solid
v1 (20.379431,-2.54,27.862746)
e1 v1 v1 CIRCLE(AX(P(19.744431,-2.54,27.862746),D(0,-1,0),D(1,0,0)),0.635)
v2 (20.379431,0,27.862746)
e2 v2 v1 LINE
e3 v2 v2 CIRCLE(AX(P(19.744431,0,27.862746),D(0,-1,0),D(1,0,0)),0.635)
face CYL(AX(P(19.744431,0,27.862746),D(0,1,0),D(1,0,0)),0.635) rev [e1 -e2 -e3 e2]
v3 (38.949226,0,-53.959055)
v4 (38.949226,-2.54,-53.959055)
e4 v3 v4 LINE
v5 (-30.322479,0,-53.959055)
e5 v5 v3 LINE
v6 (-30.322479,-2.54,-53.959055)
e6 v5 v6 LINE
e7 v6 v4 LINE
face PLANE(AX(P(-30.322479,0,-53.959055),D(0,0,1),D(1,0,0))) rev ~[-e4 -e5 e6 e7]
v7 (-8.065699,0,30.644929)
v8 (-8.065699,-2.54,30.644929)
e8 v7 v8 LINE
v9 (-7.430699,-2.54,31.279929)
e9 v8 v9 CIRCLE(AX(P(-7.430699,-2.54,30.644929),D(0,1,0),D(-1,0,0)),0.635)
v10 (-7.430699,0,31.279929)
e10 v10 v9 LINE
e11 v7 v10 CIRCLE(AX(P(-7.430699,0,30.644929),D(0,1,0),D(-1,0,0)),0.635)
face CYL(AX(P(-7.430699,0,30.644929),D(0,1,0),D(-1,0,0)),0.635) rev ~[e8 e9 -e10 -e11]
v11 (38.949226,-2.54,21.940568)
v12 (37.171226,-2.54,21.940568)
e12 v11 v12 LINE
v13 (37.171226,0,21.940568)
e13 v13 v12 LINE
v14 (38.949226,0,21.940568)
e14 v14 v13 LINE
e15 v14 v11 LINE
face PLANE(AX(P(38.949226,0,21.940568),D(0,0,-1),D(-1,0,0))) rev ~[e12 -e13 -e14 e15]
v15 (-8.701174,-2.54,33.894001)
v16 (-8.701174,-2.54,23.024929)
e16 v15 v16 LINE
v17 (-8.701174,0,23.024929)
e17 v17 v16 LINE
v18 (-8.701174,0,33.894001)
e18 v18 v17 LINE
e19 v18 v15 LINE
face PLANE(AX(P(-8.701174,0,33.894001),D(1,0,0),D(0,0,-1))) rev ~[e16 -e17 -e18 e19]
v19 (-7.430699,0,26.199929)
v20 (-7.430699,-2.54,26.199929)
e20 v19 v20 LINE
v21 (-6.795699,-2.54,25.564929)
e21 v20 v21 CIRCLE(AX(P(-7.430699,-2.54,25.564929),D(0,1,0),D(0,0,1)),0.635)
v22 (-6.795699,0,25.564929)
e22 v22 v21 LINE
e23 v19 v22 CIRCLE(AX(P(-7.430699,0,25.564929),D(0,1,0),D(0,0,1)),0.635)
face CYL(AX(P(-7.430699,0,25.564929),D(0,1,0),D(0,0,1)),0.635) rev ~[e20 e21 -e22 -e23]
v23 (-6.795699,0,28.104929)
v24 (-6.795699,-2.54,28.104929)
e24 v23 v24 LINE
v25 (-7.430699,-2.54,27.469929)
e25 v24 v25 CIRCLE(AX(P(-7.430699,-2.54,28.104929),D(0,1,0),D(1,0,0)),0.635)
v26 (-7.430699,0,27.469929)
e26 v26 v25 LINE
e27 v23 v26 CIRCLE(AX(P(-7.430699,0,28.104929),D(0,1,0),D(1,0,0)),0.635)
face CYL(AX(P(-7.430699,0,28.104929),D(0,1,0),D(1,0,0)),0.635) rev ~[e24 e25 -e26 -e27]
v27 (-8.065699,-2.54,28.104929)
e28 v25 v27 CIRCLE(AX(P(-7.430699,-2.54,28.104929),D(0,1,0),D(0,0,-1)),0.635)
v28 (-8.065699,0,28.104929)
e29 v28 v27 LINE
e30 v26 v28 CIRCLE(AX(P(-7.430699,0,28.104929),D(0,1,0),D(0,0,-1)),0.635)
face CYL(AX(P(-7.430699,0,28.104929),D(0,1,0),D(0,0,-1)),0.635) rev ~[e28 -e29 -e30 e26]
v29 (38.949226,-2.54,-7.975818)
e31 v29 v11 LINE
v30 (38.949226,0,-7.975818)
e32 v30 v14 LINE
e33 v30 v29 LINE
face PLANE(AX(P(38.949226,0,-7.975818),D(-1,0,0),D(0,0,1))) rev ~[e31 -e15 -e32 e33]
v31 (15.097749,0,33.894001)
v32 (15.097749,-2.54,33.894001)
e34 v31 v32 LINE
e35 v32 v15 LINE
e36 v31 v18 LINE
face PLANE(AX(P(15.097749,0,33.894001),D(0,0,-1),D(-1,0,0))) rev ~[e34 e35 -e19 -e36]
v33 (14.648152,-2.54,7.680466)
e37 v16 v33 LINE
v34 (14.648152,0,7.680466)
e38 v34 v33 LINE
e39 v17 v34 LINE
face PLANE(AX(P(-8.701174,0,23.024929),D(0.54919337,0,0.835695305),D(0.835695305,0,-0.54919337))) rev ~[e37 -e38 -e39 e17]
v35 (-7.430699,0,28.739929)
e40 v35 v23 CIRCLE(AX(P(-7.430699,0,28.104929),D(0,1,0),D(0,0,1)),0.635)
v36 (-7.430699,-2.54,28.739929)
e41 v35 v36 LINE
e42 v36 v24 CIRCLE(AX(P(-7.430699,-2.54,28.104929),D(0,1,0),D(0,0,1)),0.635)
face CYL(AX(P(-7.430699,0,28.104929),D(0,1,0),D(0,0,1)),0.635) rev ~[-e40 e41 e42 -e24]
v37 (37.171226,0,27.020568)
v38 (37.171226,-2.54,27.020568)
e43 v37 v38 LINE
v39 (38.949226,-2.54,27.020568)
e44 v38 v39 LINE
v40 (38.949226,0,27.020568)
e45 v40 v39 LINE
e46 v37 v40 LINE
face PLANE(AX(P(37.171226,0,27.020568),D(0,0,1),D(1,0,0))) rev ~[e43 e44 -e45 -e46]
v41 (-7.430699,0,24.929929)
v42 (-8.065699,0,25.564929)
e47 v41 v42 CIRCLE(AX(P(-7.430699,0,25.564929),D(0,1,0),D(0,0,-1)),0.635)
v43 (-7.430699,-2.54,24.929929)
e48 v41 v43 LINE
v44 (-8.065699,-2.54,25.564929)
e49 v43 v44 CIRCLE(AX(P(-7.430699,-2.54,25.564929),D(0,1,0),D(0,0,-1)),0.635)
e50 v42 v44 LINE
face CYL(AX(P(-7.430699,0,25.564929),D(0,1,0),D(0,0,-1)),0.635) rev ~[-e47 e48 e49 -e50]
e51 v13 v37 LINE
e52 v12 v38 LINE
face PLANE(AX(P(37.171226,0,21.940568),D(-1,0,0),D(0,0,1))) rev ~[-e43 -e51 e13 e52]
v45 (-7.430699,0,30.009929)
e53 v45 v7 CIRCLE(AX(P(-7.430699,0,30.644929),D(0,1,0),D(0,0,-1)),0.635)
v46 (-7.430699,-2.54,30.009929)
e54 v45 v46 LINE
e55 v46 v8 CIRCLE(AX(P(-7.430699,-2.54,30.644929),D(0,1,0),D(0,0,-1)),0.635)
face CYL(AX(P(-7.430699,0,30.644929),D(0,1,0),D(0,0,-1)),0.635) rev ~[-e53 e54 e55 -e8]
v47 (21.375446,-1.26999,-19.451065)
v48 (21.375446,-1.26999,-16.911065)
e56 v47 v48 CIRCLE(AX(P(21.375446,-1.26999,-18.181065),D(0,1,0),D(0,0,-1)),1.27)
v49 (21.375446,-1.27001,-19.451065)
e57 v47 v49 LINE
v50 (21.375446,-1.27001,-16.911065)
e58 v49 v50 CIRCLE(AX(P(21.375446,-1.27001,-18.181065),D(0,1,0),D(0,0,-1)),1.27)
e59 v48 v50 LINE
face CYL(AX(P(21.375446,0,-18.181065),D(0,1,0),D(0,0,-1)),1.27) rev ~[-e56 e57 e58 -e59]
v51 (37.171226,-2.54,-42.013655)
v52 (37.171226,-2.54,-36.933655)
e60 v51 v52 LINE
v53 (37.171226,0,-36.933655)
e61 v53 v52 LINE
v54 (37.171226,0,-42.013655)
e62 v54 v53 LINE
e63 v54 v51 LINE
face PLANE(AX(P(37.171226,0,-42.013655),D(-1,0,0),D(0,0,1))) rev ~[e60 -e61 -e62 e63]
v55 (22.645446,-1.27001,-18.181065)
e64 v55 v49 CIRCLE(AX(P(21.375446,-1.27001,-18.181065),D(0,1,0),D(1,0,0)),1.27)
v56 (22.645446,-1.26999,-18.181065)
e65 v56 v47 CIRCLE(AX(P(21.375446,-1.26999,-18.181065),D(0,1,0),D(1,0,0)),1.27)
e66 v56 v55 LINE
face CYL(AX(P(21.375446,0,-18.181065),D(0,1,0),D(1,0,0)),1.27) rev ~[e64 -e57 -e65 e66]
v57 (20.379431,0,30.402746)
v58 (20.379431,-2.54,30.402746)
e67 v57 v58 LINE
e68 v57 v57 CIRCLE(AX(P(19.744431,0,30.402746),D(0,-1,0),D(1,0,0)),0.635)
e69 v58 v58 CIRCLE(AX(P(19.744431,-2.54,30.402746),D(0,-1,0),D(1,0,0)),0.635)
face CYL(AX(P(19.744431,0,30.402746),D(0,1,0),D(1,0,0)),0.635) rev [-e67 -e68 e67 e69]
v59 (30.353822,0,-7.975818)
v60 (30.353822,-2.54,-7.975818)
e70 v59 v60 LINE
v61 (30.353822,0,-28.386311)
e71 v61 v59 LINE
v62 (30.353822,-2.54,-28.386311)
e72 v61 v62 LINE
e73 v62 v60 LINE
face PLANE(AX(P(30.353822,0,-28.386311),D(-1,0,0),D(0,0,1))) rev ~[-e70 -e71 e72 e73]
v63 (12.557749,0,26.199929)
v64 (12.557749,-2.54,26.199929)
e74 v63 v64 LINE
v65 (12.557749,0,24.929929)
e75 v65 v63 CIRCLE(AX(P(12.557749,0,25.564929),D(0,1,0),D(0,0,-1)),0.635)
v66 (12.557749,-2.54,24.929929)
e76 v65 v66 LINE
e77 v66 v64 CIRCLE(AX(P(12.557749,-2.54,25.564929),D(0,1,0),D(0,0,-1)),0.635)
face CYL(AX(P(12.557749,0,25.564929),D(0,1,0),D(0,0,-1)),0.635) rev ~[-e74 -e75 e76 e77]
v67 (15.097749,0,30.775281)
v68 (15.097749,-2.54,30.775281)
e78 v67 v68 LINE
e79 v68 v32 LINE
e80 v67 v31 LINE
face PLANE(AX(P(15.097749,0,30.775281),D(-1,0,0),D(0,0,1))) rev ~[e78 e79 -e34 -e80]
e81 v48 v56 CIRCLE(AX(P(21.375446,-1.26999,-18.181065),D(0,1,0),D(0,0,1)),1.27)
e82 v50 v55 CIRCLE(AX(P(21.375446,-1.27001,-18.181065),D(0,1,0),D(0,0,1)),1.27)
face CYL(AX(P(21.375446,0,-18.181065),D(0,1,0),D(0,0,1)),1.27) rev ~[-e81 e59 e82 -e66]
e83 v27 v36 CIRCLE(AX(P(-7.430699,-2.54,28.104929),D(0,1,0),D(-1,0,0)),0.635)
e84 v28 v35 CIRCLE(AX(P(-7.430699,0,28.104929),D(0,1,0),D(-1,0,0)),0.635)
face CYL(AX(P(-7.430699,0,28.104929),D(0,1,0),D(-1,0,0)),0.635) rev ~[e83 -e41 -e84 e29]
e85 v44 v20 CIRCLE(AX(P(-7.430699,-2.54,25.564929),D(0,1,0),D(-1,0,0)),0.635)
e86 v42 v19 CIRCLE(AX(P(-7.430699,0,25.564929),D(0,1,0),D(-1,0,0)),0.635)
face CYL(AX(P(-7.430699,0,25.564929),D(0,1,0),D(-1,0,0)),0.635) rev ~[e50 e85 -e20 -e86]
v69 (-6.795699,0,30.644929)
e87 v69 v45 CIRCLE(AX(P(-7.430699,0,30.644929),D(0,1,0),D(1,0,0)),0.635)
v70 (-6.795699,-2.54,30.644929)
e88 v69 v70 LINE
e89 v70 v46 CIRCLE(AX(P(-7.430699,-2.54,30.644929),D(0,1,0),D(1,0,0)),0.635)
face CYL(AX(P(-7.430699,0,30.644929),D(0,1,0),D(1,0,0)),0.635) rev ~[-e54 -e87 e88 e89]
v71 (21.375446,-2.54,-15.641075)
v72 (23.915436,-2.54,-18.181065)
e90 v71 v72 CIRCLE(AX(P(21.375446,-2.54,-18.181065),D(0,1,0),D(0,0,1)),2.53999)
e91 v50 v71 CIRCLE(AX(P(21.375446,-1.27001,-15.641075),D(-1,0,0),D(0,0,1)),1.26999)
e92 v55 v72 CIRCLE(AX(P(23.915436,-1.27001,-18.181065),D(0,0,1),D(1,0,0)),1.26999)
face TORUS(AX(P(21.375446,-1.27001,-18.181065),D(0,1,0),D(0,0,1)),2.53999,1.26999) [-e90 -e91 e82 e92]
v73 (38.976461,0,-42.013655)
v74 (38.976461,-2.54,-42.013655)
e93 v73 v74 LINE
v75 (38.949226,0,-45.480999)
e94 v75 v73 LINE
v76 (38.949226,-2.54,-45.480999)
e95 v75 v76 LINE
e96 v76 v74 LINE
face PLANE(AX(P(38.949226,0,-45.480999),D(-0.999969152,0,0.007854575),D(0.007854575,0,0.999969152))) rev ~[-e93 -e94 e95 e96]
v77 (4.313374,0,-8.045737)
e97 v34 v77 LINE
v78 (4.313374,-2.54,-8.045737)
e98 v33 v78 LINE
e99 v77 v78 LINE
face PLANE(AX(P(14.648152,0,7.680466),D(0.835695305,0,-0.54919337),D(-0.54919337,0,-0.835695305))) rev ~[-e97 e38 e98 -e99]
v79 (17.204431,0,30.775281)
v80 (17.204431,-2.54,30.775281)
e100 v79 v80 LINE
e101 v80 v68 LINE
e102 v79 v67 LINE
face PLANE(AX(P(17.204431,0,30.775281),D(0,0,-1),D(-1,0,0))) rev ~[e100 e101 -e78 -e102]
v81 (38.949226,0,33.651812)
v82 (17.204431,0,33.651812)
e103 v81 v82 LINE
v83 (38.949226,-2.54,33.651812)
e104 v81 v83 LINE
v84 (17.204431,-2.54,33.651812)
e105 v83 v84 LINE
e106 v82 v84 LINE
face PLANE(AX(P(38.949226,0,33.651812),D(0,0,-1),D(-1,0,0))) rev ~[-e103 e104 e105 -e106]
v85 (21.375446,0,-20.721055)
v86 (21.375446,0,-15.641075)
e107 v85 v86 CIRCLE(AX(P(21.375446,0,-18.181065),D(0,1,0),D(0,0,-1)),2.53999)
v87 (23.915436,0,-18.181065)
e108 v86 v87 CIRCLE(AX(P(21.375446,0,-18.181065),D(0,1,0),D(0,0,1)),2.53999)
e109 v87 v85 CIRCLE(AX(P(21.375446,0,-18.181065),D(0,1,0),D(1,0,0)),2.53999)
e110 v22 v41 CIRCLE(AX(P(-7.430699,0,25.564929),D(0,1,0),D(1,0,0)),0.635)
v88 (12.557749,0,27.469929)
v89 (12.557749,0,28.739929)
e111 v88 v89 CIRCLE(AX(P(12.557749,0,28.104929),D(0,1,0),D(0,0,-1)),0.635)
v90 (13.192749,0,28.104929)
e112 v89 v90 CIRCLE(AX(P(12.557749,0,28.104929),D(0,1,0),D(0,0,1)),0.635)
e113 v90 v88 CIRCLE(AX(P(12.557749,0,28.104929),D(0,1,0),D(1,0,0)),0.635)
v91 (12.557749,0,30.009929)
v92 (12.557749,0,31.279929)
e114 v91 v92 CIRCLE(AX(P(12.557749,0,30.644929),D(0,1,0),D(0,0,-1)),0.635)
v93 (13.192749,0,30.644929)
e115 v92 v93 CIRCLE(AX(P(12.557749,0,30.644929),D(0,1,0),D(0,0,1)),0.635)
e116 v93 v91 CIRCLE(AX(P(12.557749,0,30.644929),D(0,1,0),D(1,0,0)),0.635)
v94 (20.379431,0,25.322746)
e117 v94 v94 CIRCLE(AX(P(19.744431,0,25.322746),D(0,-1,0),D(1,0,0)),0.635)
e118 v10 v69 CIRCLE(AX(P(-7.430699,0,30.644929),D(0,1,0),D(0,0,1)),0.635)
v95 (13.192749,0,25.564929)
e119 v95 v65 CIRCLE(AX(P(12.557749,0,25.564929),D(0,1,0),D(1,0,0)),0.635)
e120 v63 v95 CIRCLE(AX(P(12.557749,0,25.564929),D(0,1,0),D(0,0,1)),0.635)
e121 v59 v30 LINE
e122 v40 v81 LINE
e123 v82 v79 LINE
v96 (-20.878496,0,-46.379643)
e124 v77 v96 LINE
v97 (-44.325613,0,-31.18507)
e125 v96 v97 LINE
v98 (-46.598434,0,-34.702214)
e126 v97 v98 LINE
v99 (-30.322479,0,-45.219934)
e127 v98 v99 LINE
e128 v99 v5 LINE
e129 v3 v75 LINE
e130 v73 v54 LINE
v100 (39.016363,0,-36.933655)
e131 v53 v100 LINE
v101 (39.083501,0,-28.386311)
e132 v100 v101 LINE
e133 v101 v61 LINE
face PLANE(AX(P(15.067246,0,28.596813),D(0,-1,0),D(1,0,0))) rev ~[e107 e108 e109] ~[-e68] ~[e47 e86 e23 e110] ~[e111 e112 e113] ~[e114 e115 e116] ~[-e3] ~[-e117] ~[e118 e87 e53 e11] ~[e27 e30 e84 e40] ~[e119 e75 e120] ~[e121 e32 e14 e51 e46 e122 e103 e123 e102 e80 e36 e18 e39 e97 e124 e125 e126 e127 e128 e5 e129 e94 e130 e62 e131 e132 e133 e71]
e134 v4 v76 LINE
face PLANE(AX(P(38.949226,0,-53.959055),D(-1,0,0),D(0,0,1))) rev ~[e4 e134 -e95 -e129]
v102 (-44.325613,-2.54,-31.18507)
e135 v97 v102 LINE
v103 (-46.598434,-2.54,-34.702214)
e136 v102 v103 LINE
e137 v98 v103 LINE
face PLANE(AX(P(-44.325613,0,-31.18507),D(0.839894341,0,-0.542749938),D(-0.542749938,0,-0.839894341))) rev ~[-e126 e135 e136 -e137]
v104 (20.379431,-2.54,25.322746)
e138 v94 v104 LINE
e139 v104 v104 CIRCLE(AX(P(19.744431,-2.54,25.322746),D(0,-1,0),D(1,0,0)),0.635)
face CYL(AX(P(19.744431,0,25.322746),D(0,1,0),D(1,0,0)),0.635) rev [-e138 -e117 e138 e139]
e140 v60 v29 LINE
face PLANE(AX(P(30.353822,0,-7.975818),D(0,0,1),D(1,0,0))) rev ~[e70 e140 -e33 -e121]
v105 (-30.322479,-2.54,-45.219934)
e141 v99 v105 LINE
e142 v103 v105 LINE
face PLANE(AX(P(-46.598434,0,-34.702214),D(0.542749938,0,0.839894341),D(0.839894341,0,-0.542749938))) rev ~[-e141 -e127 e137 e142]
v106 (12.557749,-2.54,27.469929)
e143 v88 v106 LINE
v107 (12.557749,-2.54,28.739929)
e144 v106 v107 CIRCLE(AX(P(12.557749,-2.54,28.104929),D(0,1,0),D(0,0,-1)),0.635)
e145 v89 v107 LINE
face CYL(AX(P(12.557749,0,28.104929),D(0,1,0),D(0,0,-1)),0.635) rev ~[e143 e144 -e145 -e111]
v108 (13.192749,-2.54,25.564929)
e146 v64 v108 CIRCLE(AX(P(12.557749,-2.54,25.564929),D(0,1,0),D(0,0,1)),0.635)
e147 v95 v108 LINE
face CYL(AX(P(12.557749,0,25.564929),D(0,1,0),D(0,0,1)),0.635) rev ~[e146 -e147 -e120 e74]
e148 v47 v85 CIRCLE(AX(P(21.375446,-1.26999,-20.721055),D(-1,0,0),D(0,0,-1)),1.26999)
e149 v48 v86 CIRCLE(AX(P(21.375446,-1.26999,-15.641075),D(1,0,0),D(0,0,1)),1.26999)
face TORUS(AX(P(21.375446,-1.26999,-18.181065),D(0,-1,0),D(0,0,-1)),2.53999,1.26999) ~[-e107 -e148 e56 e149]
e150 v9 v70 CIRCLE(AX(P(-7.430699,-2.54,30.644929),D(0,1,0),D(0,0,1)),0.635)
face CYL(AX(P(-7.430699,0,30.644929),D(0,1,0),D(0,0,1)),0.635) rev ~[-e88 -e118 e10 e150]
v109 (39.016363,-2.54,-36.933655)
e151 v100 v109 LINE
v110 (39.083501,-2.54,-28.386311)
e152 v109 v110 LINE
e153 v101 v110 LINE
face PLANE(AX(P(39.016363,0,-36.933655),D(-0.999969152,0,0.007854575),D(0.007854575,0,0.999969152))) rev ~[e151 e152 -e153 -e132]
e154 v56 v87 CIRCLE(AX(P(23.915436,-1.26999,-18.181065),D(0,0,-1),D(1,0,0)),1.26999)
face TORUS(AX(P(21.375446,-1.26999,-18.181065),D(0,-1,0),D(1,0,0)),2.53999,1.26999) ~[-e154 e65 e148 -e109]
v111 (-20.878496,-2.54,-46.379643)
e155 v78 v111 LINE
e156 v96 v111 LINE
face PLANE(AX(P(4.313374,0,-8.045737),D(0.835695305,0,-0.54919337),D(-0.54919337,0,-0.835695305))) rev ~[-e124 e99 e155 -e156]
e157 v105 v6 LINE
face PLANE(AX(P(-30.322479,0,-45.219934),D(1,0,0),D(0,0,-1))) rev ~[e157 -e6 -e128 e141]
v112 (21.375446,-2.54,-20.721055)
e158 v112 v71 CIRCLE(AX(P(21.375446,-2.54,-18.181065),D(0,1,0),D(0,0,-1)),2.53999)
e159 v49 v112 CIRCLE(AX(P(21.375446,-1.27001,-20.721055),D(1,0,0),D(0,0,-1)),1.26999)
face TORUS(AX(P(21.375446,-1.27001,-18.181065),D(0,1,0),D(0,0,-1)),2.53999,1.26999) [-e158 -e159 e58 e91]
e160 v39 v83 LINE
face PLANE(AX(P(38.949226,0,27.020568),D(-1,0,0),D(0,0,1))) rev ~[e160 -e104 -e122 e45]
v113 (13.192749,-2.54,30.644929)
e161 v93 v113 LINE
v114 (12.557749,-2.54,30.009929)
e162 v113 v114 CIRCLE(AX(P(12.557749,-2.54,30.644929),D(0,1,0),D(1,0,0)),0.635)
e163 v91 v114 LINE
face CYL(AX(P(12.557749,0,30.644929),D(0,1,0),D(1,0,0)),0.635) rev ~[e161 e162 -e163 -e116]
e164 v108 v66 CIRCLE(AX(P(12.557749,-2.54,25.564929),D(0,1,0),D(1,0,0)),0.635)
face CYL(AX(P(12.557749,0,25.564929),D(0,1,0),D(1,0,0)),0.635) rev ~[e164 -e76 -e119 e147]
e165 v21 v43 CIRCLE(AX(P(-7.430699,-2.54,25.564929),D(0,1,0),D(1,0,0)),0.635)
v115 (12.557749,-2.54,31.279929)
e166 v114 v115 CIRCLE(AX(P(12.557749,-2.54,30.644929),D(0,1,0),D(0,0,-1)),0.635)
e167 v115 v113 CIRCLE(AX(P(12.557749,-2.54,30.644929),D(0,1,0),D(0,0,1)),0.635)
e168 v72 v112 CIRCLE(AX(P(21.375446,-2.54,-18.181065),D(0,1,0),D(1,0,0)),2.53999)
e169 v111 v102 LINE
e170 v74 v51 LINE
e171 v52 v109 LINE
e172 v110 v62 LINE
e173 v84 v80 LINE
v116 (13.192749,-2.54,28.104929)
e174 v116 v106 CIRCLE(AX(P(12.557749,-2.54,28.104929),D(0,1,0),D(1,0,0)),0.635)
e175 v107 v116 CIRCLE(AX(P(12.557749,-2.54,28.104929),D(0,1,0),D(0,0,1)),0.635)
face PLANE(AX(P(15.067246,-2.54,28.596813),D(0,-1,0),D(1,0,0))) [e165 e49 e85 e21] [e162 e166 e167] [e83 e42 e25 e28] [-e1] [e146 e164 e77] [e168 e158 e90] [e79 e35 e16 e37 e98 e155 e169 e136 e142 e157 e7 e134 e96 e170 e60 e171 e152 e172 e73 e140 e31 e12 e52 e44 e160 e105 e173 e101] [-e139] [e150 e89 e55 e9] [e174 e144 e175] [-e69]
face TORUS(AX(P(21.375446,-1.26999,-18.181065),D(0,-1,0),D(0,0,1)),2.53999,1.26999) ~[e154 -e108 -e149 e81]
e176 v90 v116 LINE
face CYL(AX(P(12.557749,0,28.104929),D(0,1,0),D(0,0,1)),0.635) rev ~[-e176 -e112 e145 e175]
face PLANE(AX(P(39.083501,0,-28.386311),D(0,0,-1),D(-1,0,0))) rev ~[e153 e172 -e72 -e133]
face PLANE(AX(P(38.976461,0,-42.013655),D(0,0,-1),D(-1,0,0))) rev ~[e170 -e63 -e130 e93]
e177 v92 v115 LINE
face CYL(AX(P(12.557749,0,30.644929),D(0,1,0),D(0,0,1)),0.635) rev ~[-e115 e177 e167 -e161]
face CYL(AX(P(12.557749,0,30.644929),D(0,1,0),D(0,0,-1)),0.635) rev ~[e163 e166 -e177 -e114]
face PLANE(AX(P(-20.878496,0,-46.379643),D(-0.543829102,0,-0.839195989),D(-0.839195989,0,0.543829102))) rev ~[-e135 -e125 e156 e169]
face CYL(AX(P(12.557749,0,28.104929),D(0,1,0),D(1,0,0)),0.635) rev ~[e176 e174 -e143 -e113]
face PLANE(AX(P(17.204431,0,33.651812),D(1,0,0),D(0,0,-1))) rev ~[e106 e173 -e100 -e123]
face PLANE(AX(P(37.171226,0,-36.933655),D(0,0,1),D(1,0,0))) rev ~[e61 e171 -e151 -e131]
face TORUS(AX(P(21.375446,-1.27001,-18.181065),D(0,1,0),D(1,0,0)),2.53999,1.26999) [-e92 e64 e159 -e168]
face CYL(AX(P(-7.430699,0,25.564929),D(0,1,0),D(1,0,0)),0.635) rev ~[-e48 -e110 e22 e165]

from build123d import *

# Parameters (mm, degrees)
F0_R     = 0.635
F1_DEPTH = 2.54
F2_R     = 1.26999


# Not quite as in the source:
# - a fillet or chamfer is up to 0.001 mm smaller than in the source, because OpenCascade refuses the exact size


with BuildPart() as f1:
    # F0 (on Front) → F1 (new body)
    with BuildSketch(Plane.XZ):
        Polygon((15.0977487051, 33.894000689), (-8.7011743405, 33.894000689), (-8.7011743405, 30.6449289119), (-8.7011743405, 30.6394077664), (-8.7011743405, 28.5887729555), (-8.7011743405, 28.1049289119), (-8.7011743405, 23.0249289119), (21.375445649, 23.0249289119), (37.1712256595, 23.0249289119), (37.1712256595, 27.0205680281), (38.9492256595, 27.0205680281), (38.9492256595, 30.7752811804), (38.9492256595, 33.6518122062), (17.204430995, 33.6518122062), (17.204430995, 30.7752811804), (15.0977487051, 30.7752811804), align=None)
        with BuildLine():
            ThreePointArc((-6.7956986329, 25.5649289119), (-6.9816858268, 25.1159161058), (-7.4306986329, 24.9299289119))
            ThreePointArc((-7.4306986329, 24.9299289119), (-7.8797114389, 25.1159161058), (-8.0656986329, 25.5649289119))
            ThreePointArc((-8.0656986329, 25.5649289119), (-7.8797114389, 26.0139417179), (-7.4306986329, 26.1999289119))
            ThreePointArc((-7.4306986329, 26.1999289119), (-6.9816858268, 26.0139417179), (-6.7956986329, 25.5649289119))
        make_face(mode=Mode.SUBTRACT)
        with BuildLine():
            ThreePointArc((-7.4306986329, 28.7399289119), (-6.9816858268, 28.5539417179), (-6.7956986329, 28.1049289119))
            ThreePointArc((-6.7956986329, 28.1049289119), (-6.9816858268, 27.6559161058), (-7.4306986329, 27.4699289119))
            ThreePointArc((-7.4306986329, 27.4699289119), (-7.8797114389, 27.6559161058), (-8.0656986329, 28.1049289119))
            ThreePointArc((-8.0656986329, 28.1049289119), (-7.8797114389, 28.5539417179), (-7.4306986329, 28.7399289119))
        make_face(mode=Mode.SUBTRACT)
        with BuildLine():
            ThreePointArc((-7.4306986329, 30.0099289119), (-7.8797114389, 30.1959161058), (-8.0656986329, 30.6449289119))
            ThreePointArc((-8.0656986329, 30.6449289119), (-7.8797114389, 31.0939417179), (-7.4306986329, 31.2799289119))
            ThreePointArc((-7.4306986329, 31.2799289119), (-6.9816858268, 31.0939417179), (-6.7956986329, 30.6449289119))
            ThreePointArc((-6.7956986329, 30.6449289119), (-6.9816858268, 30.1959161058), (-7.4306986329, 30.0099289119))
        make_face(mode=Mode.SUBTRACT)
        with BuildLine():
            ThreePointArc((13.1927487051, 25.5649289119), (13.0067615112, 25.1159161058), (12.5577487051, 24.9299289119))
            ThreePointArc((12.5577487051, 24.9299289119), (11.9227487051, 25.5649289119), (12.5577487051, 26.1999289119))
            ThreePointArc((12.5577487051, 26.1999289119), (13.0067615112, 26.0139417179), (13.1927487051, 25.5649289119))
        make_face(mode=Mode.SUBTRACT)
        with BuildLine():
            ThreePointArc((12.5577487051, 28.7399289119), (13.0067615112, 28.5539417179), (13.1927487051, 28.1049289119))
            ThreePointArc((13.1927487051, 28.1049289119), (13.0067615112, 27.6559161058), (12.5577487051, 27.4699289119))
            ThreePointArc((12.5577487051, 27.4699289119), (11.9227487051, 28.1049289119), (12.5577487051, 28.7399289119))
        make_face(mode=Mode.SUBTRACT)
        with BuildLine():
            ThreePointArc((13.1927487051, 30.6449289119), (13.0067615112, 30.1959161058), (12.5577487051, 30.0099289119))
            ThreePointArc((12.5577487051, 30.0099289119), (11.9227487051, 30.6449289119), (12.5577487051, 31.2799289119))
            ThreePointArc((12.5577487051, 31.2799289119), (13.0067615112, 31.0939417179), (13.1927487051, 30.6449289119))
        make_face(mode=Mode.SUBTRACT)
        with Locations((19.744430995, 25.3227458062)):
            Circle(F0_R, mode=Mode.SUBTRACT)
        with Locations((19.744430995, 27.8627458062)):
            Circle(F0_R, mode=Mode.SUBTRACT)
        with Locations((19.744430995, 30.4027458062)):
            Circle(F0_R, mode=Mode.SUBTRACT)
        with BuildLine():
            Line((21.375445649, 23.0249289119), (-8.7011743405, 23.0249289119))
            Line((-8.7011743405, 23.0249289119), (14.6481524707, 7.6804661495))
            Line((14.6481524707, 7.6804661495), (4.3133735196, -8.0457365195))
            Line((4.3133735196, -8.0457365195), (4.3133735196, -53.9590548808))
            Line((4.3133735196, -53.9590548808), (21.375445649, -53.9590548808))
            Line((21.375445649, -53.9590548808), (21.375445649, -19.4510648049))
            ThreePointArc((21.375445649, -19.4510648049), (20.105445649, -18.1810648049), (21.375445649, -16.9110648049))
            Line((21.375445649, -16.9110648049), (21.375445649, 23.0249289119))
        make_face()
        with BuildLine():
            Line((37.1712256595, 23.0249289119), (21.375445649, 23.0249289119))
            Line((21.375445649, 23.0249289119), (21.375445649, -16.9110648049))
            ThreePointArc((21.375445649, -16.9110648049), (22.2734712611, -17.2830391928), (22.645445649, -18.1810648049))
            Line((22.645445649, -18.1810648049), (30.3538220114, -18.1810648049))
            Line((30.3538220114, -18.1810648049), (30.3538220114, -7.9758184713))
            Line((30.3538220114, -7.9758184713), (38.9492256595, -7.9758184713))
            Line((38.9492256595, -7.9758184713), (38.9492256595, 5.319000689))
            Line((38.9492256595, 5.319000689), (38.9492256595, 21.9405680281))
            Line((38.9492256595, 21.9405680281), (37.1712256595, 21.9405680281))
            Line((37.1712256595, 21.9405680281), (37.1712256595, 23.0249289119))
        make_face()
        Polygon((4.3133735196, -53.9590548808), (4.3133735196, -8.0457365195), (-20.8784960799, -46.3796427219), (-44.3256125721, -31.185070223), (-46.598433602, -34.7022139158), (-30.3224786203, -45.2199339734), (-30.3224786203, -53.9590548808), align=None)
        with BuildLine():
            Line((30.3538220114, -18.1810648049), (22.645445649, -18.1810648049))
            ThreePointArc((22.645445649, -18.1810648049), (22.2734712611, -19.079090417), (21.375445649, -19.4510648049))
            Line((21.375445649, -19.4510648049), (21.375445649, -53.9590548808))
            Line((21.375445649, -53.9590548808), (38.9492256595, -53.9590548808))
            Line((38.9492256595, -53.9590548808), (38.9492256595, -45.480999311))
            Line((38.9492256595, -45.480999311), (38.9492256595, -42.0136552247))
            Line((38.9492256595, -42.0136552247), (37.1712256595, -42.0136552247))
            Line((37.1712256595, -42.0136552247), (37.1712256595, -36.9336552247))
            Line((37.1712256595, -36.9336552247), (38.9492256595, -36.9336552247))
            Line((38.9492256595, -36.9336552247), (38.9492256595, -28.3863111384))
            Line((38.9492256595, -28.3863111384), (30.3538220114, -28.3863111384))
            Line((30.3538220114, -28.3863111384), (30.3538220114, -18.1810648049))
        make_face()
        Polygon((38.9492256595, -42.0136552247), (38.9492256595, -45.480999311), (38.9764610146, -42.0136552247), align=None)
        Polygon((39.0835013158, -28.3863111384), (38.9492256595, -28.3863111384), (38.9492256595, -36.9336552247), (39.0163634877, -36.9336552247), align=None)
    extrude(amount=F1_DEPTH)

    # F2 (radius 1.27 in the source; OpenCascade refuses exactly that, so slightly less here)
    f2_edges = [f1.edges().sort_by_distance(p)[0] for p in [
        (20.105446, -2.54, -18.181065),
        (20.105446, 0, -18.181065),
    ]]
    fillet(f2_edges, radius=F2_R)


solid = f1.part
